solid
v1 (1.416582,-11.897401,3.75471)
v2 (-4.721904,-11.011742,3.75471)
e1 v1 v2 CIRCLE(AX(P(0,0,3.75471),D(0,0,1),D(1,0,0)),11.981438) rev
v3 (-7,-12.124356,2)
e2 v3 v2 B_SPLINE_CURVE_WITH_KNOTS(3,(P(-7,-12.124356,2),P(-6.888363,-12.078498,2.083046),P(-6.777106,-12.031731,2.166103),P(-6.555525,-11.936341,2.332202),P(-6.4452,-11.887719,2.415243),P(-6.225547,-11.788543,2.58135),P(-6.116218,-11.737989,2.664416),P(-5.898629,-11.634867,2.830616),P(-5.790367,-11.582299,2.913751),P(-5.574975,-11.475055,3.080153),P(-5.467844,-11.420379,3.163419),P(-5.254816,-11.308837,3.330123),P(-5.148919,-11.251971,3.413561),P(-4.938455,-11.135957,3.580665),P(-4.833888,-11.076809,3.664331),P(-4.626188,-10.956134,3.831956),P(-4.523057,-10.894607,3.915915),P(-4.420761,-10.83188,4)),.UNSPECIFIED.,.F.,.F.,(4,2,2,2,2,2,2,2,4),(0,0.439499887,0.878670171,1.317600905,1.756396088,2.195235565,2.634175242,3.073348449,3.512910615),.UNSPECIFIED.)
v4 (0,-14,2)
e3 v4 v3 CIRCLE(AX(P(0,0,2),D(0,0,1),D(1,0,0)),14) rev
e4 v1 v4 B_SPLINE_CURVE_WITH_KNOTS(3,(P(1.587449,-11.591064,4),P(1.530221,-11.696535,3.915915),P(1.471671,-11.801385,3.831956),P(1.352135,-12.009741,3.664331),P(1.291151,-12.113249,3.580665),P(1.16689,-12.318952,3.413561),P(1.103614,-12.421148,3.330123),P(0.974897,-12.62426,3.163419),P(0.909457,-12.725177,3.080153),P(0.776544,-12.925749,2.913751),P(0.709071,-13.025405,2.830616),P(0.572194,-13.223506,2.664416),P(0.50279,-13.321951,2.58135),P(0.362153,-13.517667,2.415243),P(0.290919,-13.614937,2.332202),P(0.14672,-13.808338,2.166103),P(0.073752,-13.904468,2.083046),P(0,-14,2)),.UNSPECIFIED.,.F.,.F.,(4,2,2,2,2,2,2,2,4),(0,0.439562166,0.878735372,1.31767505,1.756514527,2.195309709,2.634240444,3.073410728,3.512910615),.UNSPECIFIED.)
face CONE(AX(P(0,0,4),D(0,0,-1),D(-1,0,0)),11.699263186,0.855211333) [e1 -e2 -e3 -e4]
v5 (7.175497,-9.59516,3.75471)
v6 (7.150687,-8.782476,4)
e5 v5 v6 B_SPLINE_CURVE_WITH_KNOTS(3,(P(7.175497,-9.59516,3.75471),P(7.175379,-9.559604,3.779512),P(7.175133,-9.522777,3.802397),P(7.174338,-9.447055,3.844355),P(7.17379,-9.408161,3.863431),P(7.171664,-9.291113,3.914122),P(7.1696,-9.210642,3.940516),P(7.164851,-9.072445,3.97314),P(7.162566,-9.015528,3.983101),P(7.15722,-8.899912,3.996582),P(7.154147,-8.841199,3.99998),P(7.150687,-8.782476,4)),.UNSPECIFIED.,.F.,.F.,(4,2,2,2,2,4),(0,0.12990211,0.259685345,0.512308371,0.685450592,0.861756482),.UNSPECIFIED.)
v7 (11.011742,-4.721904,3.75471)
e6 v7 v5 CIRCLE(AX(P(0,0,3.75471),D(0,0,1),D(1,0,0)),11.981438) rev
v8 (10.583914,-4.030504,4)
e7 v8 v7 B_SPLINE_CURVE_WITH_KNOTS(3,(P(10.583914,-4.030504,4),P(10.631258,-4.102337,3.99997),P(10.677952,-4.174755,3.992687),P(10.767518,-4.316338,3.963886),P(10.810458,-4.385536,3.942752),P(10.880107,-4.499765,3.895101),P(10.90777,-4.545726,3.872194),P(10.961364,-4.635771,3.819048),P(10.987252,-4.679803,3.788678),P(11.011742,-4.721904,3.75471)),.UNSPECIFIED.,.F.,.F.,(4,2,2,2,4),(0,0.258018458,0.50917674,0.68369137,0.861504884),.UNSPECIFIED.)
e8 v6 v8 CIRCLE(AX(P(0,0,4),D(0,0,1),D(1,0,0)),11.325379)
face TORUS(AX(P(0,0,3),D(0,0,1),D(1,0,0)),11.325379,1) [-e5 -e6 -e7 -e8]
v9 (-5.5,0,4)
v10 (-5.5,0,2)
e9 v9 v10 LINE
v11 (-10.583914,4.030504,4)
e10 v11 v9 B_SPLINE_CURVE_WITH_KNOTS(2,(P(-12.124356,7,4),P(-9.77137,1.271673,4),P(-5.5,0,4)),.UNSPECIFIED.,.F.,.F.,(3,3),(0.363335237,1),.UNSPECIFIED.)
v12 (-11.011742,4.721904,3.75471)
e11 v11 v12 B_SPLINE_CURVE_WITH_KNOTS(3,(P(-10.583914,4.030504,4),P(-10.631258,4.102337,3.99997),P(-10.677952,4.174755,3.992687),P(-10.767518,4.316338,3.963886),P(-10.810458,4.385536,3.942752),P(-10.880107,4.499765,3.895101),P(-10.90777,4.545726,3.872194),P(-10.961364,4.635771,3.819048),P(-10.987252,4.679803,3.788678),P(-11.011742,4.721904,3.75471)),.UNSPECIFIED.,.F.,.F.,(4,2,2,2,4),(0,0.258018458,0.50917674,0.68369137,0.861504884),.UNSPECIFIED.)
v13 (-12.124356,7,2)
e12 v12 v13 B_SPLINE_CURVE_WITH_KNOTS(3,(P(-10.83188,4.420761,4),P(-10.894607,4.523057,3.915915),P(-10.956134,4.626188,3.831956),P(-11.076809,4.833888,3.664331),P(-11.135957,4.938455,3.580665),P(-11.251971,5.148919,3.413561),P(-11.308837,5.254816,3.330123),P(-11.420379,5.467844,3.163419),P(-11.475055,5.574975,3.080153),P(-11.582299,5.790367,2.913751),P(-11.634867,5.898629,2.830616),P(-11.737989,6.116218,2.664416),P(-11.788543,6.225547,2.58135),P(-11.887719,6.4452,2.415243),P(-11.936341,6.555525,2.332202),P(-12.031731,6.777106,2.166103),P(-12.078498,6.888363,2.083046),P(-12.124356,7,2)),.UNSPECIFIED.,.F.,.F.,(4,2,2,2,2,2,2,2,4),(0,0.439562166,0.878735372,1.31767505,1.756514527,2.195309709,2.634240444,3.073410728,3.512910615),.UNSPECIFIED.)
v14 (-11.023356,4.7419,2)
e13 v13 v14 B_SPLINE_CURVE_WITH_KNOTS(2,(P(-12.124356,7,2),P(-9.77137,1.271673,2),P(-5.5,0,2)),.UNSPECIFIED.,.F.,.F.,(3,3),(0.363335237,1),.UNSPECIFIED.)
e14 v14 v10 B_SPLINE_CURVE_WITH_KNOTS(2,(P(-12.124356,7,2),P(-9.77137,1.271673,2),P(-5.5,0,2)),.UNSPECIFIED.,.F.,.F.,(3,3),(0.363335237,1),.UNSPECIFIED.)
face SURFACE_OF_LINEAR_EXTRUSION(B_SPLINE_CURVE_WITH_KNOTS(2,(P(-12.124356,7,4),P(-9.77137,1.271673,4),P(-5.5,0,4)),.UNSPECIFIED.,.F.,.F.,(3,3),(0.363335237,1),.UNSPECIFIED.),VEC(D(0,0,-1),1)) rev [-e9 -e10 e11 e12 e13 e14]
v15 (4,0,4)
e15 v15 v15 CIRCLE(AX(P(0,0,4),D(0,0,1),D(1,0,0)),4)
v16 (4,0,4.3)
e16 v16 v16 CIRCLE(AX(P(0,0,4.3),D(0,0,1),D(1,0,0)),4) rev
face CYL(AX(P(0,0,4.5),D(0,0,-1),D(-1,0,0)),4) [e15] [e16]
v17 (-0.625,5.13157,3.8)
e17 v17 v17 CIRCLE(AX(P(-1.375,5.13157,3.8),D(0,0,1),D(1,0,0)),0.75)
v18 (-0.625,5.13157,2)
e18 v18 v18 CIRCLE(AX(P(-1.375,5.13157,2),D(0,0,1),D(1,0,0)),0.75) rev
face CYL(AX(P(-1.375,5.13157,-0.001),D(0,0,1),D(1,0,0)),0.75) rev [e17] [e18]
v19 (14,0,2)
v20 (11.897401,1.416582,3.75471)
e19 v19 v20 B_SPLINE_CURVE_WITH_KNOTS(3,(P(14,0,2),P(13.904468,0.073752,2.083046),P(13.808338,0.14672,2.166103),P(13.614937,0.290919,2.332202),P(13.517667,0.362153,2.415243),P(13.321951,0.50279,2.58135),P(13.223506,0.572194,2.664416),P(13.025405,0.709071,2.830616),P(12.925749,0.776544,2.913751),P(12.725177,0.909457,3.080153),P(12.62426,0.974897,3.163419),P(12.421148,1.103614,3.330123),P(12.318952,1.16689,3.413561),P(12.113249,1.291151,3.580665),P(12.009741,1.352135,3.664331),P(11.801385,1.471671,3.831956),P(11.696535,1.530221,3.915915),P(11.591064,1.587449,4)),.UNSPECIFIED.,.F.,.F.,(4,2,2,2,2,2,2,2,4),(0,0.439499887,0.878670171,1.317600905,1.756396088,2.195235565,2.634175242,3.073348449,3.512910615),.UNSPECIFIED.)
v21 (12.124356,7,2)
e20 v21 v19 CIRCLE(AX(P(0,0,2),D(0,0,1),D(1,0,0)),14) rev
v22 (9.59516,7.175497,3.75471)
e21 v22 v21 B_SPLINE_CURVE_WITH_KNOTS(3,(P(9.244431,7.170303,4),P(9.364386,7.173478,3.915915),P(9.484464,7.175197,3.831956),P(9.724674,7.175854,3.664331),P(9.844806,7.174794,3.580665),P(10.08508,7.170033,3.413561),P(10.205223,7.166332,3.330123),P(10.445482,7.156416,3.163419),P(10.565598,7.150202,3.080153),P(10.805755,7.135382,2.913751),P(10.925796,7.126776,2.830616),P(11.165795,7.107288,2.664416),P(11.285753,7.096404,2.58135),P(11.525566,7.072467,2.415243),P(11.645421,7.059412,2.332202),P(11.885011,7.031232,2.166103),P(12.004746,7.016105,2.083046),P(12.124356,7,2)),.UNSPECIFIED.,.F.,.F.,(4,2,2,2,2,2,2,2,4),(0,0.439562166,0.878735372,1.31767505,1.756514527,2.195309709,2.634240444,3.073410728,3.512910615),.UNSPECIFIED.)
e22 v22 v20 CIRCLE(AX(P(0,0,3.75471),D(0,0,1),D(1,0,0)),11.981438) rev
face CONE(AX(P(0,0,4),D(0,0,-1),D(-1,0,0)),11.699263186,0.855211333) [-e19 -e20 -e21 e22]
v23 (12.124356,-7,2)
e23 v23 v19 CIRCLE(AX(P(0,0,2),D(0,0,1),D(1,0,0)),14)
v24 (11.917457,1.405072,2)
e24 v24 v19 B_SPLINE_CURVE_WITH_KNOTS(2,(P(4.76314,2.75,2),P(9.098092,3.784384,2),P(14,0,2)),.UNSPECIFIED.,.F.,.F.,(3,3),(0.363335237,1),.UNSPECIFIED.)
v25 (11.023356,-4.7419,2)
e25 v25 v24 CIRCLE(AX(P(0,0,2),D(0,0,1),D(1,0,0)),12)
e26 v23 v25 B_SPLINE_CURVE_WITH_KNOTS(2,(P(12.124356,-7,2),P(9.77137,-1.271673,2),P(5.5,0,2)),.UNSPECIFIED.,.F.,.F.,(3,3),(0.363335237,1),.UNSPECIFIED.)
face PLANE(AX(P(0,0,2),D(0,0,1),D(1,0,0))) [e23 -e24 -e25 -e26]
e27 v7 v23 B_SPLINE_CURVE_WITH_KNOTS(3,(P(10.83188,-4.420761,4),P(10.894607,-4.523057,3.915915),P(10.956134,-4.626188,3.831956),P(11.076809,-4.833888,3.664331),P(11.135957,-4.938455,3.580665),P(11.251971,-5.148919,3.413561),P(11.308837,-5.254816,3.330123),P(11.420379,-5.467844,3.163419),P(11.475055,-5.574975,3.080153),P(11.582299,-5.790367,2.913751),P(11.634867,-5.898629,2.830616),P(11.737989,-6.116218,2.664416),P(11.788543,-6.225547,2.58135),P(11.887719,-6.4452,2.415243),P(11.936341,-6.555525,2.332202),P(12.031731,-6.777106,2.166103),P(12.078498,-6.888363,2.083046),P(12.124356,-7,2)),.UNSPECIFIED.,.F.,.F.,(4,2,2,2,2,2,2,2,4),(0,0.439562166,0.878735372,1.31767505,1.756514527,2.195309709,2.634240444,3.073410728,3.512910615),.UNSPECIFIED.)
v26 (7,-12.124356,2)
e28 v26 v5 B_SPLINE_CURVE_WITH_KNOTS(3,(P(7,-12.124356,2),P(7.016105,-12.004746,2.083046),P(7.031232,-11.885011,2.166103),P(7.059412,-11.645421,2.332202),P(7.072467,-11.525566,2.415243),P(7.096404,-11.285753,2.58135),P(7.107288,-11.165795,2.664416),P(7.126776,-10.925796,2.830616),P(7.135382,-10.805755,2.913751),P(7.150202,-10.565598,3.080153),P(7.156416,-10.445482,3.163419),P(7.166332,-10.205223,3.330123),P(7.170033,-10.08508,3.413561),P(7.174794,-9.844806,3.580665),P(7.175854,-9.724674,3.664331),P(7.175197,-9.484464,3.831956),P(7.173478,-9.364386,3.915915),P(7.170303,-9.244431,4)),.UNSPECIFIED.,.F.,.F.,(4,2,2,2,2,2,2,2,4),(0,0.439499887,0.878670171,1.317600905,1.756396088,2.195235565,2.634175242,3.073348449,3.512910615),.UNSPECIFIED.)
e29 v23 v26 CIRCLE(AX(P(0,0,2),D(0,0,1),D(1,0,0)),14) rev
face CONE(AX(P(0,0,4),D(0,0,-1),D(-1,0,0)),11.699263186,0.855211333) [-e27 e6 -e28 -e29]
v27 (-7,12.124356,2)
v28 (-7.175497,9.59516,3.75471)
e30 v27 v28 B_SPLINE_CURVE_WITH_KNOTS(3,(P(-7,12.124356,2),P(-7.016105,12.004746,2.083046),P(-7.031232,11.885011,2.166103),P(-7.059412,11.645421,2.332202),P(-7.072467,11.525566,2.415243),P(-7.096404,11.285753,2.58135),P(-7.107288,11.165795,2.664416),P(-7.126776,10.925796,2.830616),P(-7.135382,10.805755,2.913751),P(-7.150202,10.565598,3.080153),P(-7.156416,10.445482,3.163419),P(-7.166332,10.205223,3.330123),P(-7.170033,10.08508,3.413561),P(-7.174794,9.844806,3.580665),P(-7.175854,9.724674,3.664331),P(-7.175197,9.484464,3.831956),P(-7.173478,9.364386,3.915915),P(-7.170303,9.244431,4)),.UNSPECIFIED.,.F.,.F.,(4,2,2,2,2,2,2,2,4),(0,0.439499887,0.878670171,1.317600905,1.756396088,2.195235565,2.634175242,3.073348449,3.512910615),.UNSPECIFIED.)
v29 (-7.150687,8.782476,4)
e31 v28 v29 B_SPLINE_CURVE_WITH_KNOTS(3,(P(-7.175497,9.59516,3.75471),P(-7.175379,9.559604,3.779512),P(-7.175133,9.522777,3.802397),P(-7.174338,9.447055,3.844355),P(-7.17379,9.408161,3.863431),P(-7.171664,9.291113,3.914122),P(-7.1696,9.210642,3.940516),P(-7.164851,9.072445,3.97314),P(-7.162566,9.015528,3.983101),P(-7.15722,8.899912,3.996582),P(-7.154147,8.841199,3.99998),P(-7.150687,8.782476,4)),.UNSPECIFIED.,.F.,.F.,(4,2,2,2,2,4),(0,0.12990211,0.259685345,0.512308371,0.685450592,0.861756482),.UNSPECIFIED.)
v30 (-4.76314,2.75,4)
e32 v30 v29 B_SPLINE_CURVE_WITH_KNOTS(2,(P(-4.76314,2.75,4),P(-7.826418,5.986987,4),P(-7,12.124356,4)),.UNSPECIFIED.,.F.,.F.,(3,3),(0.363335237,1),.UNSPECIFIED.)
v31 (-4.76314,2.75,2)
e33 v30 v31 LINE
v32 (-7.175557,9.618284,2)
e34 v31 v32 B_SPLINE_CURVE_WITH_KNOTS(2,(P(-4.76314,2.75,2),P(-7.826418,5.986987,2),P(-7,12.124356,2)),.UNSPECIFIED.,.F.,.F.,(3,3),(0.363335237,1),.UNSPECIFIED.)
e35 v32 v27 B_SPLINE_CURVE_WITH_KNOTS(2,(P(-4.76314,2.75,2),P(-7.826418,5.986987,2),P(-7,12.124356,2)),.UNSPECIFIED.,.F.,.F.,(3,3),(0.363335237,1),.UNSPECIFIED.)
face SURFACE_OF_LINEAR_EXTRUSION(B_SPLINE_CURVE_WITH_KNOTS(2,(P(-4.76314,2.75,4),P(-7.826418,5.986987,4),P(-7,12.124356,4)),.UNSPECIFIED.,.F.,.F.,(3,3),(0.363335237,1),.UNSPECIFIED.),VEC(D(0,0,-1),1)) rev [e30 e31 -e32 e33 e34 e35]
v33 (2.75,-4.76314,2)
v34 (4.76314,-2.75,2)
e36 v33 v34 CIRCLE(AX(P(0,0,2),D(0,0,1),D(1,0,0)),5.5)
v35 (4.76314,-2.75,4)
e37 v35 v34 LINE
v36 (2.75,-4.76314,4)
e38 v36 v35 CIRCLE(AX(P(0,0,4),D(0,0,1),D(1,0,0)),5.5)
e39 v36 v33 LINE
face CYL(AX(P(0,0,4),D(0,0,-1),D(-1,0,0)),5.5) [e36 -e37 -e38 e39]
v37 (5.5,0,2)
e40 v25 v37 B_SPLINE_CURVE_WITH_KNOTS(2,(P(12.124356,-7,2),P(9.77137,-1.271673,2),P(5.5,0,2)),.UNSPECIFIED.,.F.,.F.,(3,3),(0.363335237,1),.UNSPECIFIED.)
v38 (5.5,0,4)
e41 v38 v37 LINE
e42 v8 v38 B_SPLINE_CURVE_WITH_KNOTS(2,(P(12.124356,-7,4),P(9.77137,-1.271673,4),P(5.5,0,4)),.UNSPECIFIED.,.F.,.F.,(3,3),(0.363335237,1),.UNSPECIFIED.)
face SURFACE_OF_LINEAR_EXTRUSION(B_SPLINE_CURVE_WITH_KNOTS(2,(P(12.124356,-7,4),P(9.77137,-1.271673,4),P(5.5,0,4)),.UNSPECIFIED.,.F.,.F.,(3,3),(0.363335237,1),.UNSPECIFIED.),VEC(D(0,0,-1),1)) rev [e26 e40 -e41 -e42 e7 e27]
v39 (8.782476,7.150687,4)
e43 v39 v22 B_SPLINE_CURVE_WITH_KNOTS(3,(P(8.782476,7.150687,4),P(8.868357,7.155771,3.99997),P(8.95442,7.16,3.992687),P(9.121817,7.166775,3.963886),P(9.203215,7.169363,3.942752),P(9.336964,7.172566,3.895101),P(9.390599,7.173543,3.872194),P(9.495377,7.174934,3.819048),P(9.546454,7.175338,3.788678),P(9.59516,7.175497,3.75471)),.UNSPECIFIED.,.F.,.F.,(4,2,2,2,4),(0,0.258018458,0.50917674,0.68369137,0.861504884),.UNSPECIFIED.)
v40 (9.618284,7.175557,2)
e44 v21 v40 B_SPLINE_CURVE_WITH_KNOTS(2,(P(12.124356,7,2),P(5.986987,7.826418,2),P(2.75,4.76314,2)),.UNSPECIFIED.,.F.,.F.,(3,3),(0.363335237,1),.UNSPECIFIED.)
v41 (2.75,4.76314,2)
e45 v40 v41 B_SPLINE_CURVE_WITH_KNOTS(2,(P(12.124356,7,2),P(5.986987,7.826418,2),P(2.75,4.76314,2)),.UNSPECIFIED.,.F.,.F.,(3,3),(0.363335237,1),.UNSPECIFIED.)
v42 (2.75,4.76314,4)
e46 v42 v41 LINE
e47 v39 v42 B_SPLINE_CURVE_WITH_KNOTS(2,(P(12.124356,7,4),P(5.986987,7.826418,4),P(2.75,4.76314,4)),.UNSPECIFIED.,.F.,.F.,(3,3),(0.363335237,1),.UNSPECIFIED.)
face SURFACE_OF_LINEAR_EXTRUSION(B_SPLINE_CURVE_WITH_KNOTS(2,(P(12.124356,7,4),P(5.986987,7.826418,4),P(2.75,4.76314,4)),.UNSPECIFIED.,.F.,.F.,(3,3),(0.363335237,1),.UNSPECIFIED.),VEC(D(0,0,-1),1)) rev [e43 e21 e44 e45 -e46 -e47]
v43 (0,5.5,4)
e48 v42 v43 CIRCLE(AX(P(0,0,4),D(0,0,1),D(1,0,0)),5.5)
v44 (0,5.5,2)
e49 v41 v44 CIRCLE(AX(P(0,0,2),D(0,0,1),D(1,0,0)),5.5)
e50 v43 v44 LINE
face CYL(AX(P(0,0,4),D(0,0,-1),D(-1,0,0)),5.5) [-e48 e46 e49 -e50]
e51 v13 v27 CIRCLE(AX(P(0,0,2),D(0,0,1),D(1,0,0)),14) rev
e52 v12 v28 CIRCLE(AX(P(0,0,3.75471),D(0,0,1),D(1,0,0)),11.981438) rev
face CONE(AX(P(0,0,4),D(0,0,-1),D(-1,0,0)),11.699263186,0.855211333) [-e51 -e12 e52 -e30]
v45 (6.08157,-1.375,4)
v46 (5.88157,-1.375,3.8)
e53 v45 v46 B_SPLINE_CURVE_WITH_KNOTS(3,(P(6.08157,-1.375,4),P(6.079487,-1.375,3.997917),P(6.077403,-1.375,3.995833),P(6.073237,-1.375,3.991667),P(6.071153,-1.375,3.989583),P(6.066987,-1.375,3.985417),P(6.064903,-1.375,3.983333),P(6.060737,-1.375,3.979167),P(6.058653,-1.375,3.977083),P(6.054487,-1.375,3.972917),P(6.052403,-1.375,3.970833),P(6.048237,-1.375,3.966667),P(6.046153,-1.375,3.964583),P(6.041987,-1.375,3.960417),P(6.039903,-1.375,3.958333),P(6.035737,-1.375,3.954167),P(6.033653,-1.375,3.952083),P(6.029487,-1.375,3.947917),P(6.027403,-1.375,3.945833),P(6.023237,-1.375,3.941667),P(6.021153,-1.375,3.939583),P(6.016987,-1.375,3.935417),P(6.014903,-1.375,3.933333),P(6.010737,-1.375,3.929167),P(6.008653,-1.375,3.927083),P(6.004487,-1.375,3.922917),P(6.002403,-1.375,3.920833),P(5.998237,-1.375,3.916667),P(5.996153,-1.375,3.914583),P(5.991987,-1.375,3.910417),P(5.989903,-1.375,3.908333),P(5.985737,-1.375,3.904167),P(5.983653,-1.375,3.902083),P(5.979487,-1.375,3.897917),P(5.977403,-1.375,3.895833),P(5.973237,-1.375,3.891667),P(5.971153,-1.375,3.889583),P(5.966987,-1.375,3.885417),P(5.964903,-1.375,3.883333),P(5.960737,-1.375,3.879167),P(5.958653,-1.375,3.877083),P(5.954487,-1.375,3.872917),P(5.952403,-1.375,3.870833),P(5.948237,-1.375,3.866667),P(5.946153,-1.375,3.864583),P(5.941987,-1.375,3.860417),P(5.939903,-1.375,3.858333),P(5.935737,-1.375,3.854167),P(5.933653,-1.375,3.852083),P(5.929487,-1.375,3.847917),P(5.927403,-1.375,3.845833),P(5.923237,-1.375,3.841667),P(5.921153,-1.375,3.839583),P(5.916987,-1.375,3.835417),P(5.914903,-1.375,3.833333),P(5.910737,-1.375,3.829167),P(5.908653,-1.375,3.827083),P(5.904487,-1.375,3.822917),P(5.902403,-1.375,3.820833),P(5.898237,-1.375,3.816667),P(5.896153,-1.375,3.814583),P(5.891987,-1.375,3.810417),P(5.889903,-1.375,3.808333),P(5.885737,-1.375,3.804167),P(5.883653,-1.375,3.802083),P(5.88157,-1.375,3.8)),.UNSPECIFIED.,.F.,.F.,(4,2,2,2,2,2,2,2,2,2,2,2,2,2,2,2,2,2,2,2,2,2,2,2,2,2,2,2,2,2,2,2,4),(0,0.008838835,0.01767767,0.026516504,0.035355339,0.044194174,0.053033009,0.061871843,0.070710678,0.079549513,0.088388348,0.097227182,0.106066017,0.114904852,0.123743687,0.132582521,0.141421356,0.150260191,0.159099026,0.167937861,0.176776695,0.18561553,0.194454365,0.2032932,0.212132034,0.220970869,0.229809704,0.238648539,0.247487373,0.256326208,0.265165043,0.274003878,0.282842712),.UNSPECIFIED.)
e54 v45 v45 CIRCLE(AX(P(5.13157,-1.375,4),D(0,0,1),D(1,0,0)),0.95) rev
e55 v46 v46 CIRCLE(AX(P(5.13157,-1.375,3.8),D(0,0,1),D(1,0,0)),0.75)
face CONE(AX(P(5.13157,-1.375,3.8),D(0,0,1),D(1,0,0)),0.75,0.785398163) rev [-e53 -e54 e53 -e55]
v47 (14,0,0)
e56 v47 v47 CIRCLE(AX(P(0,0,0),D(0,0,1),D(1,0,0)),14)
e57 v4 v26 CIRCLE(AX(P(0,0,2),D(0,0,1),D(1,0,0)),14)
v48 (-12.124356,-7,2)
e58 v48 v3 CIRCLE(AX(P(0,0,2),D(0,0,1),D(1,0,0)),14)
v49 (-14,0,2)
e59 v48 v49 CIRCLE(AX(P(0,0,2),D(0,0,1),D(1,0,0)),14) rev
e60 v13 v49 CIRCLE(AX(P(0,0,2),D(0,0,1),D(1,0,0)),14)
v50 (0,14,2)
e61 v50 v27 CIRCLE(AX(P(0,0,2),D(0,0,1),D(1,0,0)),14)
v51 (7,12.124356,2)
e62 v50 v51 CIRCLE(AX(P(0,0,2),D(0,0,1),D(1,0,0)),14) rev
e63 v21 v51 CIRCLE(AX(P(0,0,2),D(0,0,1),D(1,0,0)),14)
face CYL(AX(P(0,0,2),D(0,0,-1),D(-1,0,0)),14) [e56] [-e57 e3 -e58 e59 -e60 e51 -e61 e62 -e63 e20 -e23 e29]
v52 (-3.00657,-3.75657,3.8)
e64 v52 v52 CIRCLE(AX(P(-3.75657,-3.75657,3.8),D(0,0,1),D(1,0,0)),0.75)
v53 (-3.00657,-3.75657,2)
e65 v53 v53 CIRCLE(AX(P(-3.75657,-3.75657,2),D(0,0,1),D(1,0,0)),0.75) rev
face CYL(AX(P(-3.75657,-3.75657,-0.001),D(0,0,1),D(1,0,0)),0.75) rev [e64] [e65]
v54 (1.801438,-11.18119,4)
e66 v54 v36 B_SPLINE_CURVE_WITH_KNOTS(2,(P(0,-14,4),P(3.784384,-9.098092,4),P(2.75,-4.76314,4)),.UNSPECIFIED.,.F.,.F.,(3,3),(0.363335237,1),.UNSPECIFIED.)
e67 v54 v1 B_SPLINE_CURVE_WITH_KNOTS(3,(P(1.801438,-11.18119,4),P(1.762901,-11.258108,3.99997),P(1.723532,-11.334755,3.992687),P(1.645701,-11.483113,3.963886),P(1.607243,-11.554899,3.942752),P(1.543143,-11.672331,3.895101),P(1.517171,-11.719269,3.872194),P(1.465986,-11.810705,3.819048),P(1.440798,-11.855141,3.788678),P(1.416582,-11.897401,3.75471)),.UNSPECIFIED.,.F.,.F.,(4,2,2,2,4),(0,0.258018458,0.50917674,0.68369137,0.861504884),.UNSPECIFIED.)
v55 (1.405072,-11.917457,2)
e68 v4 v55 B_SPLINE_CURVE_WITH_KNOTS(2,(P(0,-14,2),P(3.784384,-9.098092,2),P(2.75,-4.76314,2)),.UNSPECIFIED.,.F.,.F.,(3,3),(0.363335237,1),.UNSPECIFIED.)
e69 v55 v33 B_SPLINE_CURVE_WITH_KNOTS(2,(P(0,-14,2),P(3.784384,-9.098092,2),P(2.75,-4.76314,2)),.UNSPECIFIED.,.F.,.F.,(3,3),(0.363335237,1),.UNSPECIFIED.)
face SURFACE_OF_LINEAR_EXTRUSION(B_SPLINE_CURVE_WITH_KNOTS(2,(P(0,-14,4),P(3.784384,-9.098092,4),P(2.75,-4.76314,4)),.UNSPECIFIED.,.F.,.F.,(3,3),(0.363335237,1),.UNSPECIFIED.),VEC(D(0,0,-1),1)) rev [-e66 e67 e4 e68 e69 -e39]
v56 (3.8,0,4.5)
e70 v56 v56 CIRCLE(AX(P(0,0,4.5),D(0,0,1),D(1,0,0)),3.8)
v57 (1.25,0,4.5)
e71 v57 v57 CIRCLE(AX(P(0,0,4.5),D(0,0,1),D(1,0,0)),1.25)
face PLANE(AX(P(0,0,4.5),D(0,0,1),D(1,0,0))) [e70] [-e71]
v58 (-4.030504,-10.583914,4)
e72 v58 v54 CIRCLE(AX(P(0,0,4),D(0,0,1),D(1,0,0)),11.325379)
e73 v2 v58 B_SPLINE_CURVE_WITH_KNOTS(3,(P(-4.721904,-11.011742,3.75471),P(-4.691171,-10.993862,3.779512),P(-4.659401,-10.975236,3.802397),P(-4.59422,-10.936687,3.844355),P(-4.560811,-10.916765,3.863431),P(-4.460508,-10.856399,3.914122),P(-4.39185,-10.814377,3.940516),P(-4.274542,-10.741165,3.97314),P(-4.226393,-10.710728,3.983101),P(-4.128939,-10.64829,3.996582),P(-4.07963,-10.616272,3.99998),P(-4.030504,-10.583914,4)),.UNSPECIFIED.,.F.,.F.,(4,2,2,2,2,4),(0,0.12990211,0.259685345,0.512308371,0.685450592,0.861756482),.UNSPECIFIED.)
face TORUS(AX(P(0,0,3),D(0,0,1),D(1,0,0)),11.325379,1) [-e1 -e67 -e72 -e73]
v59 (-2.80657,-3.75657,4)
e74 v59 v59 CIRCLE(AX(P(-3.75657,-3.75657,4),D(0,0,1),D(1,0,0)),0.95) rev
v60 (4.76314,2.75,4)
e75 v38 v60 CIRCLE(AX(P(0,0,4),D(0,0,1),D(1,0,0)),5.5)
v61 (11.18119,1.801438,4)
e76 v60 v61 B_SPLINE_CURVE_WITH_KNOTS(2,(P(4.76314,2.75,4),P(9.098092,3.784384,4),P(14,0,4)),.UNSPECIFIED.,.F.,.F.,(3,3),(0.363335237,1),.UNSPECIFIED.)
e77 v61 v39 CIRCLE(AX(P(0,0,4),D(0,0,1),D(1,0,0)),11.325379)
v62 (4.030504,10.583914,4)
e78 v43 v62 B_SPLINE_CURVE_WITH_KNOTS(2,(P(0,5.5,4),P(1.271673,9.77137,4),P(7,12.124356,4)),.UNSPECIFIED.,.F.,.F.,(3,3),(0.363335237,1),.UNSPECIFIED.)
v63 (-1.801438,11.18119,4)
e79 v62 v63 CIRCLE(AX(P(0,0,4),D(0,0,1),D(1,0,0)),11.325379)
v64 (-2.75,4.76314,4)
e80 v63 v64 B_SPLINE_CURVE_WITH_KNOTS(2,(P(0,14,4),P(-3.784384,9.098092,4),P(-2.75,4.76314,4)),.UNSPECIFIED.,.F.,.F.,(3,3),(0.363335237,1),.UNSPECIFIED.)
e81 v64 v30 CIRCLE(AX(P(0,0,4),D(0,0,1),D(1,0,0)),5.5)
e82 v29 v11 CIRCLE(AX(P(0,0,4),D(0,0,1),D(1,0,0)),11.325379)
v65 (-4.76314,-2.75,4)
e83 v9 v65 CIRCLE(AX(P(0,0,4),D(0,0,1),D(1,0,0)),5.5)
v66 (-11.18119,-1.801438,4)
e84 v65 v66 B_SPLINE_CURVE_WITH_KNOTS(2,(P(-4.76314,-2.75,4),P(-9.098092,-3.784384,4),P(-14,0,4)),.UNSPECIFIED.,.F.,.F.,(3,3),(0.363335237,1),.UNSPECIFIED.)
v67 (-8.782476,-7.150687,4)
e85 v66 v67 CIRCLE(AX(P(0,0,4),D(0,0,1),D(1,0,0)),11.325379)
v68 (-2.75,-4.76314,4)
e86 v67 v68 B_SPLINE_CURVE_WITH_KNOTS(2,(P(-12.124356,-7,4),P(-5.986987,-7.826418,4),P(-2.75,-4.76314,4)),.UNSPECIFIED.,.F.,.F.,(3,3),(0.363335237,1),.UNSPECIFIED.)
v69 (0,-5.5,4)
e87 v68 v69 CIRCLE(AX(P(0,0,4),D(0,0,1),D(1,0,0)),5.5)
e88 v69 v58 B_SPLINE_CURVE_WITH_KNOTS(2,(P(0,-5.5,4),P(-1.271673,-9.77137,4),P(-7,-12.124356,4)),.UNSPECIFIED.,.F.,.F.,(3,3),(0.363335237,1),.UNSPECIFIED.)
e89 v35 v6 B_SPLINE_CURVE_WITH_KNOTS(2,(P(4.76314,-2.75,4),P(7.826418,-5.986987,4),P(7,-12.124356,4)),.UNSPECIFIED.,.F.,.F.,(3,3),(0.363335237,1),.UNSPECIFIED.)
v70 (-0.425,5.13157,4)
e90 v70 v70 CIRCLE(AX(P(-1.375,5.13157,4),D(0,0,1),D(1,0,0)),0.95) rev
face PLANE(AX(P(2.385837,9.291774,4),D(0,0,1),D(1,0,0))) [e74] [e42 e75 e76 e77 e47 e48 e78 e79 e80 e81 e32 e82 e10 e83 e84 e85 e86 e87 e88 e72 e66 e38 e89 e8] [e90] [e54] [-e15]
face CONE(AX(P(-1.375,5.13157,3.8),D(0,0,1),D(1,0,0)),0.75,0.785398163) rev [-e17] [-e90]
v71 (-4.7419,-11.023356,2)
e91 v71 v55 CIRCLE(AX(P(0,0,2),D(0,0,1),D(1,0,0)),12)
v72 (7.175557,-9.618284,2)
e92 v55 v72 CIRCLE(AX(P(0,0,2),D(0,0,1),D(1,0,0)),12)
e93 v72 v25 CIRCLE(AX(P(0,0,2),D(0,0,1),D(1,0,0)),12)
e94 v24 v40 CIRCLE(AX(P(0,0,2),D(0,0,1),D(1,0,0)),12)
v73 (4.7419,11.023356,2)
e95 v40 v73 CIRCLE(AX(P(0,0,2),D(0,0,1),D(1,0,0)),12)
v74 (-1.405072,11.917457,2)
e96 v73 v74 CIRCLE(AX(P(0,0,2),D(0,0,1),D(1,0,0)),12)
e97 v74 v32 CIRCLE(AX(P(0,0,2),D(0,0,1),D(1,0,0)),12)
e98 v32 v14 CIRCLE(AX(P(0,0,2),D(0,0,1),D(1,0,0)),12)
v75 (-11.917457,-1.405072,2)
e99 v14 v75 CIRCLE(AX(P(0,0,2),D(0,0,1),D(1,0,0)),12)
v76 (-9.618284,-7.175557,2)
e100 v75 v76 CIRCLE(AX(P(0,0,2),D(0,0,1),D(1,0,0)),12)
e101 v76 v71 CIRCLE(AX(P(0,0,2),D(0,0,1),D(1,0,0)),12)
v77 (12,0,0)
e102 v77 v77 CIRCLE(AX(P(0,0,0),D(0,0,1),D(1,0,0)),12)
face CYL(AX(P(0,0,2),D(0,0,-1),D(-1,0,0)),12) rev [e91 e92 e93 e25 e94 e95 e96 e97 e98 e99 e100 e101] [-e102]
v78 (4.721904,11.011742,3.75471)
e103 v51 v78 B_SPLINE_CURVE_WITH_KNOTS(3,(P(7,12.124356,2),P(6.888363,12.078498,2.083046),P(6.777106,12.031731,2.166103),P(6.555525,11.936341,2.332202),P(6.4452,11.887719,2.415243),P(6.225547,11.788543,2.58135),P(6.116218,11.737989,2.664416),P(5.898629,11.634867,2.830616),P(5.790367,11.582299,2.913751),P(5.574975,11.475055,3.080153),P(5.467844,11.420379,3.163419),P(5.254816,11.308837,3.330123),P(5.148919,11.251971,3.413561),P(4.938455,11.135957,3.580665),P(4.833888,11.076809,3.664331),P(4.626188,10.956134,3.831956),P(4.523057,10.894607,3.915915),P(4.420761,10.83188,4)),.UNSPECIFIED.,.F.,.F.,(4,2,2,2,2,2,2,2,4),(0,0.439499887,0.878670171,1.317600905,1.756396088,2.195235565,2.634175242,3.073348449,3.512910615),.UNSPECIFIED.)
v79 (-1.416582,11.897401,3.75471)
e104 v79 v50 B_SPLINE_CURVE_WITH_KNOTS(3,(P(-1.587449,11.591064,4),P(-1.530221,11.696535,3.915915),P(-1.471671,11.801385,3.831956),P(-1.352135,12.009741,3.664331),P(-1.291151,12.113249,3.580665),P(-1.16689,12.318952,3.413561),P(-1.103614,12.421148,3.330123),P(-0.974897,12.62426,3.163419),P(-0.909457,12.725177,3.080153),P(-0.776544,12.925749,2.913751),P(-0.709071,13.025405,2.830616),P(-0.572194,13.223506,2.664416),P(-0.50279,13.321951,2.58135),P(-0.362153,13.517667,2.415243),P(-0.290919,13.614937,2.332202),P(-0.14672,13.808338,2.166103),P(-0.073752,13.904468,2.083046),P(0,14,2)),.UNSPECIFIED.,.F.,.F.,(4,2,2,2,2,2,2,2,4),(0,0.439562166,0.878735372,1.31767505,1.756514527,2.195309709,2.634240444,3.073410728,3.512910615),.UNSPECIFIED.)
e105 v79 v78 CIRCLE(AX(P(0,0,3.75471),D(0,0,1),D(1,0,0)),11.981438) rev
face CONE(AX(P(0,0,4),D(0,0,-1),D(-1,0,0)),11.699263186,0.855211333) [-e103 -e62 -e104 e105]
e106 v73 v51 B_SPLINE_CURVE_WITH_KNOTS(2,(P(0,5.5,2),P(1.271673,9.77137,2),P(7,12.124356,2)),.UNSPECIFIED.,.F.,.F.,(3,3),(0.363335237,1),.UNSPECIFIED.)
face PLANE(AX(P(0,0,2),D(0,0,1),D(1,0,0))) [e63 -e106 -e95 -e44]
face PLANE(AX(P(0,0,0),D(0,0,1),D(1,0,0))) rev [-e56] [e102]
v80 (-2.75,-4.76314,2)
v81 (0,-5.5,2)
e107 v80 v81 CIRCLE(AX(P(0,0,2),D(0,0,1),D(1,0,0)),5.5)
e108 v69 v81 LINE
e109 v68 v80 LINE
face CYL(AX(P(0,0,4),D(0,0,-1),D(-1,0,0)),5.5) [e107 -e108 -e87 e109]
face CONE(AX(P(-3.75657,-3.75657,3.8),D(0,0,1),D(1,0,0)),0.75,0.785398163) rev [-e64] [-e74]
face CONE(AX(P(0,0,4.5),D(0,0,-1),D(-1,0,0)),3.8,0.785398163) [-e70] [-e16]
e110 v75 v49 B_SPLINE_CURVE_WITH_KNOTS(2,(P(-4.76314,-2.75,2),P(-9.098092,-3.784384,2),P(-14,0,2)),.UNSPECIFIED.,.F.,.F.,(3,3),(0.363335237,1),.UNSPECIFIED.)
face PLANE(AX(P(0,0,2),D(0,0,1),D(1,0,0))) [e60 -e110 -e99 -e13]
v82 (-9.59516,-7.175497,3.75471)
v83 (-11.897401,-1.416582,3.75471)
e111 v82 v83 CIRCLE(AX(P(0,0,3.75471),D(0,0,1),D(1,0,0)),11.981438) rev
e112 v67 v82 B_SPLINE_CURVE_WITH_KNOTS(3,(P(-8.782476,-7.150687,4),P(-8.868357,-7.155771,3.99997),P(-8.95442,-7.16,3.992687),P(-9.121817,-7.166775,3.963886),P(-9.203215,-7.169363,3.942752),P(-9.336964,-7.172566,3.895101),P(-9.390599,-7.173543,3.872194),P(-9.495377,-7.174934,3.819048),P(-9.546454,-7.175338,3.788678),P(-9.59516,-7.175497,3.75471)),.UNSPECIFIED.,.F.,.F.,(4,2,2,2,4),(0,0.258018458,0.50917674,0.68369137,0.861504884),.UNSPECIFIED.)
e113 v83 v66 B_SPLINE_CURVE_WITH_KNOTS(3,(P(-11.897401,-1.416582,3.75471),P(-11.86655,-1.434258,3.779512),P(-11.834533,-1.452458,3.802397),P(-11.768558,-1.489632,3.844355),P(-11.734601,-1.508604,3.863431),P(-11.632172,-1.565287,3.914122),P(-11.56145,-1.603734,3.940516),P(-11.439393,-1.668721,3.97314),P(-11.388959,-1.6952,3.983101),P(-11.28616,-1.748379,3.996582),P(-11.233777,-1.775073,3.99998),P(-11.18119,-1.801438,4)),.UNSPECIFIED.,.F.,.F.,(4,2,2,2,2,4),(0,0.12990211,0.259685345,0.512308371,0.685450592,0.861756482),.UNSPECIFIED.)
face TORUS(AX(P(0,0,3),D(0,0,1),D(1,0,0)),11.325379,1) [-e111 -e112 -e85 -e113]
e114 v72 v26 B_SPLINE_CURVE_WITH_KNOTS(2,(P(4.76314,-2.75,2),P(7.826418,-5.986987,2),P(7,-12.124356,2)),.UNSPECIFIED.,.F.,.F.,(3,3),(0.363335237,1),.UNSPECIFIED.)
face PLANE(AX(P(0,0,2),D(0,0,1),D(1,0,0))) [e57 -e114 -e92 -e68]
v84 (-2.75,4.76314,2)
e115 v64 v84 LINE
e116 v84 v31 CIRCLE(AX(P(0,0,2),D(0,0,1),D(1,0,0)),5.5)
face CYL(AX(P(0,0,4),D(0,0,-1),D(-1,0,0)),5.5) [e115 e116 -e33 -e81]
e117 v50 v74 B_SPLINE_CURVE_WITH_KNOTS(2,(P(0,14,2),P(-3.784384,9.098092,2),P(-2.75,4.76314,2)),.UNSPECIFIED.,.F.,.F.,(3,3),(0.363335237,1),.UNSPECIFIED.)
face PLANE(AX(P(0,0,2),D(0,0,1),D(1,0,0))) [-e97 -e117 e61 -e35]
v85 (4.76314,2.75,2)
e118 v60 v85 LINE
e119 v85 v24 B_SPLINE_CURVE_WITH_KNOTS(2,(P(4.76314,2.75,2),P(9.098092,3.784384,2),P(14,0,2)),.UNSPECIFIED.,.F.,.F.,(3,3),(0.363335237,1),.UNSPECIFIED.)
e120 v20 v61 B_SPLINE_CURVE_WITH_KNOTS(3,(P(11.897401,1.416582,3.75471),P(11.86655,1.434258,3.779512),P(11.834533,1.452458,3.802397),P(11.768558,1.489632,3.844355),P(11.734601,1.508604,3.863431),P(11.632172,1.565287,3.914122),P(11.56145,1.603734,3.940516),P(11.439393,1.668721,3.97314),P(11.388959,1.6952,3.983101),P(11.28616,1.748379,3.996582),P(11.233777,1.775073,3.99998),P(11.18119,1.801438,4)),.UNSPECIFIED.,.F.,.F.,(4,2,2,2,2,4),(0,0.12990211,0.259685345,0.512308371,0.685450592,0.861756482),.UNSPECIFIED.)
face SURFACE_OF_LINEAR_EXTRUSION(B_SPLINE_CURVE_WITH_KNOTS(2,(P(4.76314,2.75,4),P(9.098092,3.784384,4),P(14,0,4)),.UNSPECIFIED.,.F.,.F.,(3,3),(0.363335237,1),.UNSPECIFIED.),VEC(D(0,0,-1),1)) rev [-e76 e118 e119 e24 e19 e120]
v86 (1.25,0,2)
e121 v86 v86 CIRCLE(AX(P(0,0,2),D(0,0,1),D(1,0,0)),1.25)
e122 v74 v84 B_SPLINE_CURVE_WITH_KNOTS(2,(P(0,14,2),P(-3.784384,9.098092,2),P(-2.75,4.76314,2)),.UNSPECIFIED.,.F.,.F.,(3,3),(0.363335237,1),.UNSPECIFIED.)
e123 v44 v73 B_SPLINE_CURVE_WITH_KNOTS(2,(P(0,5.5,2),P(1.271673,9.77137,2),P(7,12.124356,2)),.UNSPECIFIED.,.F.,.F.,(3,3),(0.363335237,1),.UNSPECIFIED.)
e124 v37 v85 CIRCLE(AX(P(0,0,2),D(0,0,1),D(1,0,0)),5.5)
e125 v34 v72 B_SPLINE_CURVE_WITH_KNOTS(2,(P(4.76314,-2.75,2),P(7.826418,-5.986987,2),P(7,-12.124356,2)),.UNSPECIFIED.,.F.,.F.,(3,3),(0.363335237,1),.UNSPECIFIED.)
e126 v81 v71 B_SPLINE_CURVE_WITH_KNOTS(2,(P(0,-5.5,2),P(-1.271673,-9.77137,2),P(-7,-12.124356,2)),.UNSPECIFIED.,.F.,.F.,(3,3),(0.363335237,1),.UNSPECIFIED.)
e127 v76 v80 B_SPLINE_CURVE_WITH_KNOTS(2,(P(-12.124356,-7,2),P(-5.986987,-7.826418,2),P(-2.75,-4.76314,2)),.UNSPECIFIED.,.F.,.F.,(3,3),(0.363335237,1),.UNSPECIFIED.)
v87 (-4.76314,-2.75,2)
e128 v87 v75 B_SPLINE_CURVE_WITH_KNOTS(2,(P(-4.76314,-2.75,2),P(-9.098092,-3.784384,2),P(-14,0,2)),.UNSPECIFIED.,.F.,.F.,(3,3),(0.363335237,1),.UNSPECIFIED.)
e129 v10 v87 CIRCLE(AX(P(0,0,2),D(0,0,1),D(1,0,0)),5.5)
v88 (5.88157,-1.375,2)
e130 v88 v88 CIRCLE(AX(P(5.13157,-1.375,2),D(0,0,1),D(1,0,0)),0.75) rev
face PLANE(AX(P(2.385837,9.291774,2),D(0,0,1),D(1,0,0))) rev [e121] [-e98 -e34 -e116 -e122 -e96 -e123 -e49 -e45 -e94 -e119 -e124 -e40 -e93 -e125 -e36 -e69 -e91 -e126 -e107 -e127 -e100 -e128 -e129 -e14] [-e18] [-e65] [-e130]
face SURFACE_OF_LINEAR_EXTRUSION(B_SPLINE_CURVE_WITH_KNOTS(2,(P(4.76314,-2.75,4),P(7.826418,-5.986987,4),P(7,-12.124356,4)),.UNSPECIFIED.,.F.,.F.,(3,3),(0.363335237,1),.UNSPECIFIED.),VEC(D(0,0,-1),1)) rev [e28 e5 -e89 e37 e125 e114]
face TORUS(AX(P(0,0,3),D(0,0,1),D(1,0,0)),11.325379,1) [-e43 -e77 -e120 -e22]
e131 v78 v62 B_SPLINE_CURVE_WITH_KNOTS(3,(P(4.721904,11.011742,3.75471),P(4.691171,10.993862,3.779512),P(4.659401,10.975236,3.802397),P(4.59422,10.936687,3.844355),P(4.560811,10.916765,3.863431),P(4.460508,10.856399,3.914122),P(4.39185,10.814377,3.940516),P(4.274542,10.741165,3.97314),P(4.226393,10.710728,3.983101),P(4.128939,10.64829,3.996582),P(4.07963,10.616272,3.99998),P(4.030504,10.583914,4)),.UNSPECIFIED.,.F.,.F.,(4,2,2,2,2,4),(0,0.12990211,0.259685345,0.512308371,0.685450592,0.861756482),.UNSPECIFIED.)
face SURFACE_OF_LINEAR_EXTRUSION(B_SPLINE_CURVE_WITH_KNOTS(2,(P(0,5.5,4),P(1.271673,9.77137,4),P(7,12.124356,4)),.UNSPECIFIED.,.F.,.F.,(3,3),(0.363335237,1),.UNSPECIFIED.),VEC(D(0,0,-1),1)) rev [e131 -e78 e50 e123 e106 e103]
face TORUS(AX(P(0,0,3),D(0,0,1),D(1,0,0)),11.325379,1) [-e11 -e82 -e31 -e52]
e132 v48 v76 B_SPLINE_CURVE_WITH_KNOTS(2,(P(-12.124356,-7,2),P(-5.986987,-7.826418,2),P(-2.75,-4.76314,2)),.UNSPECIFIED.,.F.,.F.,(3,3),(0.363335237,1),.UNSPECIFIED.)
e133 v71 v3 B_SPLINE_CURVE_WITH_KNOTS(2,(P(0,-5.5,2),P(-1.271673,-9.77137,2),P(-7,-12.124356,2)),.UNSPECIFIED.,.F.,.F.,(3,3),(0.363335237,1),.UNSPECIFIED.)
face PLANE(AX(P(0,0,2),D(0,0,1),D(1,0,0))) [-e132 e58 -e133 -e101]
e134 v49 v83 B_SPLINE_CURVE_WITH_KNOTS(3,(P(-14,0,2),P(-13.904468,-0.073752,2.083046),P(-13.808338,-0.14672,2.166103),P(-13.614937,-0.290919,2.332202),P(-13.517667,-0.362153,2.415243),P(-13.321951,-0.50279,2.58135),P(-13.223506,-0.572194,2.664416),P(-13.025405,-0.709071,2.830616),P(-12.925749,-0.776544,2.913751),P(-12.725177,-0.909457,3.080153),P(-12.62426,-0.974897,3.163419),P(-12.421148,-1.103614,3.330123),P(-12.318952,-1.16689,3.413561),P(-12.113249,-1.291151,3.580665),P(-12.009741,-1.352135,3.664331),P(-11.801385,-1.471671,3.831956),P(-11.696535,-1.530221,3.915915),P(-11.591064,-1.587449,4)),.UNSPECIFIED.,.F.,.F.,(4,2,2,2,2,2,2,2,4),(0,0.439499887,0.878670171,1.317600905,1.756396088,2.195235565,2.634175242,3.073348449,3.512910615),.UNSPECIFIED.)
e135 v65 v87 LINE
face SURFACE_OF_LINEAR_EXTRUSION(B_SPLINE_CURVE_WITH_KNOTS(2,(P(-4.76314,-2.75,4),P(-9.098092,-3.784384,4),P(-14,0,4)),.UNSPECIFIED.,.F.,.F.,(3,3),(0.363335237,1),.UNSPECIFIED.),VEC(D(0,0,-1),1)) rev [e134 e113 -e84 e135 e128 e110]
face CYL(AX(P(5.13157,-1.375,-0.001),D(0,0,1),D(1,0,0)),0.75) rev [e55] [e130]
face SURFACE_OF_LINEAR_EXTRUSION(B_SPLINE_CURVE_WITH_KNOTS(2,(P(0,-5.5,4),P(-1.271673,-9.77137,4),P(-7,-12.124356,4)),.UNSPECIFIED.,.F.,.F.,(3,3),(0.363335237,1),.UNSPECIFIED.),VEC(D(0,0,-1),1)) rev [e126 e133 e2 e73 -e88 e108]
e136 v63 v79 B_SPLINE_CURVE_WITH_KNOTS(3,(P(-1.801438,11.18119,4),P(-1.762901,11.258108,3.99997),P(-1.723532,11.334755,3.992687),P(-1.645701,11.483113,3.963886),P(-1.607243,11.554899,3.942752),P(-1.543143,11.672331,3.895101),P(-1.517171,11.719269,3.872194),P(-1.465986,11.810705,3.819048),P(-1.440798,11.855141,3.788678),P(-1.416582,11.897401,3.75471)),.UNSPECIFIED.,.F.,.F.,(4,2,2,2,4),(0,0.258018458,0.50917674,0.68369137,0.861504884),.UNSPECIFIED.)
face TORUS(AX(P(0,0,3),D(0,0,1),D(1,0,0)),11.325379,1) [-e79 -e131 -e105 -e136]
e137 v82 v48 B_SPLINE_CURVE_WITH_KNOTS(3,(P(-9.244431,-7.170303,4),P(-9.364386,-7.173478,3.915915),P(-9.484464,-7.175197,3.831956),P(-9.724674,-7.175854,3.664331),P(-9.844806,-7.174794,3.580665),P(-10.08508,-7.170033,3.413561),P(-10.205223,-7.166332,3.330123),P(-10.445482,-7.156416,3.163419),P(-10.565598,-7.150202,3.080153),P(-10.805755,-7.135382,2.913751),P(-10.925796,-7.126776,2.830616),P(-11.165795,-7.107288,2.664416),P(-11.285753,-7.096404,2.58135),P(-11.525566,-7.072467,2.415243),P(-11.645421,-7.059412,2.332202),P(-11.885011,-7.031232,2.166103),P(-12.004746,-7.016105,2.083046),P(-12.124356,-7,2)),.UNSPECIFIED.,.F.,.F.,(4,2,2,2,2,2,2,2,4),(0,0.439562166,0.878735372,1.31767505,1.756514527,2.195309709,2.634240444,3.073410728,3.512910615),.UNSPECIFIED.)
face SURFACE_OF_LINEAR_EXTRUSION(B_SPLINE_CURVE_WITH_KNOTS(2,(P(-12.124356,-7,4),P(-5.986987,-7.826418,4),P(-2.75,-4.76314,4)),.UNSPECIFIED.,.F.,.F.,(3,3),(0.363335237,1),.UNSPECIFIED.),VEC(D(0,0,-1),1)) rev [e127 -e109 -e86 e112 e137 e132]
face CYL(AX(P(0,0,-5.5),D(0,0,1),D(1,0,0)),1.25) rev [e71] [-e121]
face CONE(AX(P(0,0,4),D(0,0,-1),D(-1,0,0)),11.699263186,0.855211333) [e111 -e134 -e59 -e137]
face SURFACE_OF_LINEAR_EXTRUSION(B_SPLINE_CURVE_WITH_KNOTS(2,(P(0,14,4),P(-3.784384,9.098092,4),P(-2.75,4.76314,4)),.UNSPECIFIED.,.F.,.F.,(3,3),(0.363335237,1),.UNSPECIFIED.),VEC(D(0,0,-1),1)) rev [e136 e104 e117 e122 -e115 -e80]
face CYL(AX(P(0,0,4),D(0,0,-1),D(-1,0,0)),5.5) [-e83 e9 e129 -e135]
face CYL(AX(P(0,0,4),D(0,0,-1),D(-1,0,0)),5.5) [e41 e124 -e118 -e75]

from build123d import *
from OCP.BRepFilletAPI import BRepFilletAPI_MakeChamfer

# Parameters (mm, degrees)
SKETCH1_R           = 14
SKETCH1_R_2         = 12
BOSS_EXTRUDE1_DEPTH = 2
BOSS_EXTRUDE2_DEPTH = 2
CHAMFER1_SIZE       = 2
CHAMFER1_SIZE_2     = 2.300736814
FILLET1_R           = 1
SKETCH3_R           = 4
BOSS_EXTRUDE3_DEPTH = 0.5
CHAMFER2_SIZE       = 0.2
CUT_EXTRUDE1_REACH  = 22.199
SKETCH4_R           = 0.75
CHAMFER3_SIZE       = 0.2
SKETCH5_R           = 1.25
CUT_EXTRUDE2_DEPTH  = 10


with BuildPart() as part:
    # Sketch1 → Boss-Extrude1 (new body)
    with BuildSketch(Plane.XY):
        Circle(SKETCH1_R)
        Circle(SKETCH1_R_2, mode=Mode.SUBTRACT)
    extrude(amount=BOSS_EXTRUDE1_DEPTH)

    # Sketch2 → Boss-Extrude2 (add)
    with BuildSketch(Plane.XY.offset(2)):
        with BuildLine():
            ThreePointArc((-2.75, 4.763139721), (-3.889087297, 3.889087297), (-4.763139721, 2.75))
            add(Edge.make_bspline(
                [(-4.763139721, 2.75), (-7.826418416, 5.986986658), (-7, 12.124355653)],
                knots=[0.363335237, 0.363335237, 0.363335237, 1, 1, 1], degree=2))
            ThreePointArc((-7, 12.124355653), (-9.899494937, 9.899494937), (-12.124355653, 7))
            add(Edge.make_bspline(
                [(-5.5, 0), (-9.771370498, 1.27167333), (-12.124355653, 7)],
                knots=[0.363335237, 0.363335237, 0.363335237, 1, 1, 1], degree=2))
            ThreePointArc((-5.5, 0), (-5.312592045, -1.423504748), (-4.763139721, -2.75))
            add(Edge.make_bspline(
                [(-4.763139721, -2.75), (-9.098091746, -3.78438384), (-14, 0)],
                knots=[0.363335237, 0.363335237, 0.363335237, 1, 1, 1], degree=2))
            ThreePointArc((-14, 0), (-13.522961568, -3.623466631), (-12.124355653, -7))
            add(Edge.make_bspline(
                [(-2.75, -4.763139721), (-5.986986658, -7.826418416), (-12.124355653, -7)],
                knots=[0.363335237, 0.363335237, 0.363335237, 1, 1, 1], degree=2))
            ThreePointArc((-2.75, -4.763139721), (-1.423504748, -5.312592045), (0, -5.5))
            add(Edge.make_bspline(
                [(0, -5.5), (-1.27167333, -9.771370498), (-7, -12.124355653)],
                knots=[0.363335237, 0.363335237, 0.363335237, 1, 1, 1], degree=2))
            ThreePointArc((-7, -12.124355653), (-3.623466631, -13.522961568), (0, -14))
            add(Edge.make_bspline(
                [(2.75, -4.763139721), (3.78438384, -9.098091746), (0, -14)],
                knots=[0.363335237, 0.363335237, 0.363335237, 1, 1, 1], degree=2))
            ThreePointArc((2.75, -4.763139721), (3.889087297, -3.889087297), (4.763139721, -2.75))
            add(Edge.make_bspline(
                [(4.763139721, -2.75), (7.826418416, -5.986986658), (7, -12.124355653)],
                knots=[0.363335237, 0.363335237, 0.363335237, 1, 1, 1], degree=2))
            ThreePointArc((7, -12.124355653), (9.899494937, -9.899494937), (12.124355653, -7))
            add(Edge.make_bspline(
                [(5.5, 0), (9.771370498, -1.27167333), (12.124355653, -7)],
                knots=[0.363335237, 0.363335237, 0.363335237, 1, 1, 1], degree=2))
            ThreePointArc((5.5, 0), (5.312592045, 1.423504748), (4.763139721, 2.75))
            add(Edge.make_bspline(
                [(4.763139721, 2.75), (9.098091746, 3.78438384), (14, 0)],
                knots=[0.363335237, 0.363335237, 0.363335237, 1, 1, 1], degree=2))
            ThreePointArc((14, 0), (13.522961568, 3.623466631), (12.124355653, 7))
            add(Edge.make_bspline(
                [(2.75, 4.763139721), (5.986986658, 7.826418416), (12.124355653, 7)],
                knots=[0.363335237, 0.363335237, 0.363335237, 1, 1, 1], degree=2))
            ThreePointArc((2.75, 4.763139721), (1.423504748, 5.312592045), (0, 5.5))
            add(Edge.make_bspline(
                [(0, 5.5), (1.27167333, 9.771370498), (7, 12.124355653)],
                knots=[0.363335237, 0.363335237, 0.363335237, 1, 1, 1], degree=2))
            ThreePointArc((7, 12.124355653), (3.623466631, 13.522961568), (0, 14))
            add(Edge.make_bspline(
                [(-2.75, 4.763139721), (-3.78438384, 9.098091746), (0, 14)],
                knots=[0.363335237, 0.363335237, 0.363335237, 1, 1, 1], degree=2))
        make_face()
    extrude(amount=BOSS_EXTRUDE2_DEPTH)

    # Chamfer1
    chamfer1_edges_1 = [part.edges().sort_by_distance(p)[0] for p in [
        (-9.899494937, 9.899494937, 4),
    ]]
    chamfer1_side_1 = [part.faces().sort_by_distance(p)[0] for p in [
        (-9.899494937, 9.899494937, 3.96),
    ]]
    chamfer1_edges_2 = [part.edges().sort_by_distance(p)[0] for p in [
        (-13.522961568, -3.623466631, 4),
    ]]
    chamfer1_side_2 = [part.faces().sort_by_distance(p)[0] for p in [
        (-13.522961568, -3.623466631, 3.96),
    ]]
    chamfer1_edges_3 = [part.edges().sort_by_distance(p)[0] for p in [
        (13.522961568, 3.623466631, 4),
    ]]
    chamfer1_side_3 = [part.faces().sort_by_distance(p)[0] for p in [
        (13.522961568, 3.623466631, 3.96),
    ]]
    chamfer1_edges_4 = [part.edges().sort_by_distance(p)[0] for p in [
        (3.623466631, 13.522961568, 4),
    ]]
    chamfer1_side_4 = [part.faces().sort_by_distance(p)[0] for p in [
        (3.623466631, 13.522961568, 3.96),
    ]]
    chamfer1_edges_5 = [part.edges().sort_by_distance(p)[0] for p in [
        (-3.623466631, -13.522961568, 4),
    ]]
    chamfer1_side_5 = [part.faces().sort_by_distance(p)[0] for p in [
        (-3.623466631, -13.522961568, 3.96),
    ]]
    chamfer1_edges_6 = [part.edges().sort_by_distance(p)[0] for p in [
        (9.899494937, -9.899494937, 4),
    ]]
    chamfer1_side_6 = [part.faces().sort_by_distance(p)[0] for p in [
        (9.899494937, -9.899494937, 3.96),
    ]]
    chamfer1 = BRepFilletAPI_MakeChamfer(part.part.solid().wrapped)
    for e in chamfer1_edges_1:
        chamfer1.Add(CHAMFER1_SIZE - 0.0001, CHAMFER1_SIZE_2 - 0.0001, e.wrapped, chamfer1_side_1[0].wrapped)
    for e in chamfer1_edges_2:
        chamfer1.Add(CHAMFER1_SIZE - 0.0001, CHAMFER1_SIZE_2 - 0.0001, e.wrapped, chamfer1_side_2[0].wrapped)
    for e in chamfer1_edges_3:
        chamfer1.Add(CHAMFER1_SIZE - 0.0001, CHAMFER1_SIZE_2 - 0.0001, e.wrapped, chamfer1_side_3[0].wrapped)
    for e in chamfer1_edges_4:
        chamfer1.Add(CHAMFER1_SIZE - 0.0001, CHAMFER1_SIZE_2 - 0.0001, e.wrapped, chamfer1_side_4[0].wrapped)
    for e in chamfer1_edges_5:
        chamfer1.Add(CHAMFER1_SIZE - 0.0001, CHAMFER1_SIZE_2 - 0.0001, e.wrapped, chamfer1_side_5[0].wrapped)
    for e in chamfer1_edges_6:
        chamfer1.Add(CHAMFER1_SIZE - 0.0001, CHAMFER1_SIZE_2 - 0.0001, e.wrapped, chamfer1_side_6[0].wrapped)
    add(Compound.cast(chamfer1.Shape()), mode=Mode.REPLACE)  # a hair under: the kernel refuses the full size

    # Fillet1
    fillet1_edges = [part.edges().sort_by_distance(p)[0] for p in [
        (10.785366658, 4.533317219, 4),
        (9.318651204, -7.073742906, 4),
        (-1.466715454, -11.607060125, 4),
        (-10.785366658, -4.533317219, 4),
        (-9.318651204, 7.073742906, 4),
        (1.466715454, 11.607060125, 4),
    ]]
    fillet(fillet1_edges, radius=FILLET1_R)

    # Sketch3 → Boss-Extrude3 (add)
    with BuildSketch(Plane.XY.offset(4)):
        Circle(SKETCH3_R)
    extrude(amount=BOSS_EXTRUDE3_DEPTH)

    # Chamfer2
    chamfer2_edges = [part.edges().sort_by_distance(p)[0] for p in [
        (-4, 0, 4.5),
    ]]
    chamfer(chamfer2_edges, length=CHAMFER2_SIZE)

    # Sketch4 → Cut-Extrude1 (cut, up to next)
    with BuildSketch(Plane.XY.offset(4), mode=Mode.PRIVATE) as cut_extrude1_sk1:
        with Locations((-1.375, 5.13156986)):
            Circle(SKETCH4_R)
    cut_extrude1_tool1 = extrude(cut_extrude1_sk1.sketch, amount=-CUT_EXTRUDE1_REACH, mode=Mode.PRIVATE) & part.part
    # Sketch4 → Cut-Extrude1 (cut, up to next)
    with BuildSketch(Plane.XY.offset(4), mode=Mode.PRIVATE) as cut_extrude1_sk2:
        with Locations((5.13156986, -1.375)):
            Circle(SKETCH4_R)
    cut_extrude1_tool2 = extrude(cut_extrude1_sk2.sketch, amount=-CUT_EXTRUDE1_REACH, mode=Mode.PRIVATE) & part.part
    # Sketch4 → Cut-Extrude1 (cut, up to next)
    with BuildSketch(Plane.XY.offset(4), mode=Mode.PRIVATE) as cut_extrude1_sk3:
        with Locations((-3.75656986, -3.75656986)):
            Circle(SKETCH4_R)
    cut_extrude1_tool3 = extrude(cut_extrude1_sk3.sketch, amount=-CUT_EXTRUDE1_REACH, mode=Mode.PRIVATE) & part.part
    add(cut_extrude1_tool1.solids().sort_by_distance((-1.375, 5.13157, 4))[0], mode=Mode.SUBTRACT)
    add(cut_extrude1_tool2.solids().sort_by_distance((5.13157, -1.375, 4))[0], mode=Mode.SUBTRACT)
    add(cut_extrude1_tool3.solids().sort_by_distance((-3.75657, -3.75657, 4))[0], mode=Mode.SUBTRACT)

    # Chamfer3
    chamfer3_edges = [part.edges().sort_by_distance(p)[0] for p in [
        (-2.125, 5.13156986, 4),
        (4.38156986, -1.375, 4),
        (-4.50656986, -3.75656986, 4),
    ]]
    chamfer(chamfer3_edges, length=CHAMFER3_SIZE)

    # Sketch5 → Cut-Extrude2 (cut)
    with BuildSketch(Plane.XY.offset(4.5)):
        Circle(SKETCH5_R)
    extrude(amount=-CUT_EXTRUDE2_DEPTH, mode=Mode.SUBTRACT)


solid = part.part
